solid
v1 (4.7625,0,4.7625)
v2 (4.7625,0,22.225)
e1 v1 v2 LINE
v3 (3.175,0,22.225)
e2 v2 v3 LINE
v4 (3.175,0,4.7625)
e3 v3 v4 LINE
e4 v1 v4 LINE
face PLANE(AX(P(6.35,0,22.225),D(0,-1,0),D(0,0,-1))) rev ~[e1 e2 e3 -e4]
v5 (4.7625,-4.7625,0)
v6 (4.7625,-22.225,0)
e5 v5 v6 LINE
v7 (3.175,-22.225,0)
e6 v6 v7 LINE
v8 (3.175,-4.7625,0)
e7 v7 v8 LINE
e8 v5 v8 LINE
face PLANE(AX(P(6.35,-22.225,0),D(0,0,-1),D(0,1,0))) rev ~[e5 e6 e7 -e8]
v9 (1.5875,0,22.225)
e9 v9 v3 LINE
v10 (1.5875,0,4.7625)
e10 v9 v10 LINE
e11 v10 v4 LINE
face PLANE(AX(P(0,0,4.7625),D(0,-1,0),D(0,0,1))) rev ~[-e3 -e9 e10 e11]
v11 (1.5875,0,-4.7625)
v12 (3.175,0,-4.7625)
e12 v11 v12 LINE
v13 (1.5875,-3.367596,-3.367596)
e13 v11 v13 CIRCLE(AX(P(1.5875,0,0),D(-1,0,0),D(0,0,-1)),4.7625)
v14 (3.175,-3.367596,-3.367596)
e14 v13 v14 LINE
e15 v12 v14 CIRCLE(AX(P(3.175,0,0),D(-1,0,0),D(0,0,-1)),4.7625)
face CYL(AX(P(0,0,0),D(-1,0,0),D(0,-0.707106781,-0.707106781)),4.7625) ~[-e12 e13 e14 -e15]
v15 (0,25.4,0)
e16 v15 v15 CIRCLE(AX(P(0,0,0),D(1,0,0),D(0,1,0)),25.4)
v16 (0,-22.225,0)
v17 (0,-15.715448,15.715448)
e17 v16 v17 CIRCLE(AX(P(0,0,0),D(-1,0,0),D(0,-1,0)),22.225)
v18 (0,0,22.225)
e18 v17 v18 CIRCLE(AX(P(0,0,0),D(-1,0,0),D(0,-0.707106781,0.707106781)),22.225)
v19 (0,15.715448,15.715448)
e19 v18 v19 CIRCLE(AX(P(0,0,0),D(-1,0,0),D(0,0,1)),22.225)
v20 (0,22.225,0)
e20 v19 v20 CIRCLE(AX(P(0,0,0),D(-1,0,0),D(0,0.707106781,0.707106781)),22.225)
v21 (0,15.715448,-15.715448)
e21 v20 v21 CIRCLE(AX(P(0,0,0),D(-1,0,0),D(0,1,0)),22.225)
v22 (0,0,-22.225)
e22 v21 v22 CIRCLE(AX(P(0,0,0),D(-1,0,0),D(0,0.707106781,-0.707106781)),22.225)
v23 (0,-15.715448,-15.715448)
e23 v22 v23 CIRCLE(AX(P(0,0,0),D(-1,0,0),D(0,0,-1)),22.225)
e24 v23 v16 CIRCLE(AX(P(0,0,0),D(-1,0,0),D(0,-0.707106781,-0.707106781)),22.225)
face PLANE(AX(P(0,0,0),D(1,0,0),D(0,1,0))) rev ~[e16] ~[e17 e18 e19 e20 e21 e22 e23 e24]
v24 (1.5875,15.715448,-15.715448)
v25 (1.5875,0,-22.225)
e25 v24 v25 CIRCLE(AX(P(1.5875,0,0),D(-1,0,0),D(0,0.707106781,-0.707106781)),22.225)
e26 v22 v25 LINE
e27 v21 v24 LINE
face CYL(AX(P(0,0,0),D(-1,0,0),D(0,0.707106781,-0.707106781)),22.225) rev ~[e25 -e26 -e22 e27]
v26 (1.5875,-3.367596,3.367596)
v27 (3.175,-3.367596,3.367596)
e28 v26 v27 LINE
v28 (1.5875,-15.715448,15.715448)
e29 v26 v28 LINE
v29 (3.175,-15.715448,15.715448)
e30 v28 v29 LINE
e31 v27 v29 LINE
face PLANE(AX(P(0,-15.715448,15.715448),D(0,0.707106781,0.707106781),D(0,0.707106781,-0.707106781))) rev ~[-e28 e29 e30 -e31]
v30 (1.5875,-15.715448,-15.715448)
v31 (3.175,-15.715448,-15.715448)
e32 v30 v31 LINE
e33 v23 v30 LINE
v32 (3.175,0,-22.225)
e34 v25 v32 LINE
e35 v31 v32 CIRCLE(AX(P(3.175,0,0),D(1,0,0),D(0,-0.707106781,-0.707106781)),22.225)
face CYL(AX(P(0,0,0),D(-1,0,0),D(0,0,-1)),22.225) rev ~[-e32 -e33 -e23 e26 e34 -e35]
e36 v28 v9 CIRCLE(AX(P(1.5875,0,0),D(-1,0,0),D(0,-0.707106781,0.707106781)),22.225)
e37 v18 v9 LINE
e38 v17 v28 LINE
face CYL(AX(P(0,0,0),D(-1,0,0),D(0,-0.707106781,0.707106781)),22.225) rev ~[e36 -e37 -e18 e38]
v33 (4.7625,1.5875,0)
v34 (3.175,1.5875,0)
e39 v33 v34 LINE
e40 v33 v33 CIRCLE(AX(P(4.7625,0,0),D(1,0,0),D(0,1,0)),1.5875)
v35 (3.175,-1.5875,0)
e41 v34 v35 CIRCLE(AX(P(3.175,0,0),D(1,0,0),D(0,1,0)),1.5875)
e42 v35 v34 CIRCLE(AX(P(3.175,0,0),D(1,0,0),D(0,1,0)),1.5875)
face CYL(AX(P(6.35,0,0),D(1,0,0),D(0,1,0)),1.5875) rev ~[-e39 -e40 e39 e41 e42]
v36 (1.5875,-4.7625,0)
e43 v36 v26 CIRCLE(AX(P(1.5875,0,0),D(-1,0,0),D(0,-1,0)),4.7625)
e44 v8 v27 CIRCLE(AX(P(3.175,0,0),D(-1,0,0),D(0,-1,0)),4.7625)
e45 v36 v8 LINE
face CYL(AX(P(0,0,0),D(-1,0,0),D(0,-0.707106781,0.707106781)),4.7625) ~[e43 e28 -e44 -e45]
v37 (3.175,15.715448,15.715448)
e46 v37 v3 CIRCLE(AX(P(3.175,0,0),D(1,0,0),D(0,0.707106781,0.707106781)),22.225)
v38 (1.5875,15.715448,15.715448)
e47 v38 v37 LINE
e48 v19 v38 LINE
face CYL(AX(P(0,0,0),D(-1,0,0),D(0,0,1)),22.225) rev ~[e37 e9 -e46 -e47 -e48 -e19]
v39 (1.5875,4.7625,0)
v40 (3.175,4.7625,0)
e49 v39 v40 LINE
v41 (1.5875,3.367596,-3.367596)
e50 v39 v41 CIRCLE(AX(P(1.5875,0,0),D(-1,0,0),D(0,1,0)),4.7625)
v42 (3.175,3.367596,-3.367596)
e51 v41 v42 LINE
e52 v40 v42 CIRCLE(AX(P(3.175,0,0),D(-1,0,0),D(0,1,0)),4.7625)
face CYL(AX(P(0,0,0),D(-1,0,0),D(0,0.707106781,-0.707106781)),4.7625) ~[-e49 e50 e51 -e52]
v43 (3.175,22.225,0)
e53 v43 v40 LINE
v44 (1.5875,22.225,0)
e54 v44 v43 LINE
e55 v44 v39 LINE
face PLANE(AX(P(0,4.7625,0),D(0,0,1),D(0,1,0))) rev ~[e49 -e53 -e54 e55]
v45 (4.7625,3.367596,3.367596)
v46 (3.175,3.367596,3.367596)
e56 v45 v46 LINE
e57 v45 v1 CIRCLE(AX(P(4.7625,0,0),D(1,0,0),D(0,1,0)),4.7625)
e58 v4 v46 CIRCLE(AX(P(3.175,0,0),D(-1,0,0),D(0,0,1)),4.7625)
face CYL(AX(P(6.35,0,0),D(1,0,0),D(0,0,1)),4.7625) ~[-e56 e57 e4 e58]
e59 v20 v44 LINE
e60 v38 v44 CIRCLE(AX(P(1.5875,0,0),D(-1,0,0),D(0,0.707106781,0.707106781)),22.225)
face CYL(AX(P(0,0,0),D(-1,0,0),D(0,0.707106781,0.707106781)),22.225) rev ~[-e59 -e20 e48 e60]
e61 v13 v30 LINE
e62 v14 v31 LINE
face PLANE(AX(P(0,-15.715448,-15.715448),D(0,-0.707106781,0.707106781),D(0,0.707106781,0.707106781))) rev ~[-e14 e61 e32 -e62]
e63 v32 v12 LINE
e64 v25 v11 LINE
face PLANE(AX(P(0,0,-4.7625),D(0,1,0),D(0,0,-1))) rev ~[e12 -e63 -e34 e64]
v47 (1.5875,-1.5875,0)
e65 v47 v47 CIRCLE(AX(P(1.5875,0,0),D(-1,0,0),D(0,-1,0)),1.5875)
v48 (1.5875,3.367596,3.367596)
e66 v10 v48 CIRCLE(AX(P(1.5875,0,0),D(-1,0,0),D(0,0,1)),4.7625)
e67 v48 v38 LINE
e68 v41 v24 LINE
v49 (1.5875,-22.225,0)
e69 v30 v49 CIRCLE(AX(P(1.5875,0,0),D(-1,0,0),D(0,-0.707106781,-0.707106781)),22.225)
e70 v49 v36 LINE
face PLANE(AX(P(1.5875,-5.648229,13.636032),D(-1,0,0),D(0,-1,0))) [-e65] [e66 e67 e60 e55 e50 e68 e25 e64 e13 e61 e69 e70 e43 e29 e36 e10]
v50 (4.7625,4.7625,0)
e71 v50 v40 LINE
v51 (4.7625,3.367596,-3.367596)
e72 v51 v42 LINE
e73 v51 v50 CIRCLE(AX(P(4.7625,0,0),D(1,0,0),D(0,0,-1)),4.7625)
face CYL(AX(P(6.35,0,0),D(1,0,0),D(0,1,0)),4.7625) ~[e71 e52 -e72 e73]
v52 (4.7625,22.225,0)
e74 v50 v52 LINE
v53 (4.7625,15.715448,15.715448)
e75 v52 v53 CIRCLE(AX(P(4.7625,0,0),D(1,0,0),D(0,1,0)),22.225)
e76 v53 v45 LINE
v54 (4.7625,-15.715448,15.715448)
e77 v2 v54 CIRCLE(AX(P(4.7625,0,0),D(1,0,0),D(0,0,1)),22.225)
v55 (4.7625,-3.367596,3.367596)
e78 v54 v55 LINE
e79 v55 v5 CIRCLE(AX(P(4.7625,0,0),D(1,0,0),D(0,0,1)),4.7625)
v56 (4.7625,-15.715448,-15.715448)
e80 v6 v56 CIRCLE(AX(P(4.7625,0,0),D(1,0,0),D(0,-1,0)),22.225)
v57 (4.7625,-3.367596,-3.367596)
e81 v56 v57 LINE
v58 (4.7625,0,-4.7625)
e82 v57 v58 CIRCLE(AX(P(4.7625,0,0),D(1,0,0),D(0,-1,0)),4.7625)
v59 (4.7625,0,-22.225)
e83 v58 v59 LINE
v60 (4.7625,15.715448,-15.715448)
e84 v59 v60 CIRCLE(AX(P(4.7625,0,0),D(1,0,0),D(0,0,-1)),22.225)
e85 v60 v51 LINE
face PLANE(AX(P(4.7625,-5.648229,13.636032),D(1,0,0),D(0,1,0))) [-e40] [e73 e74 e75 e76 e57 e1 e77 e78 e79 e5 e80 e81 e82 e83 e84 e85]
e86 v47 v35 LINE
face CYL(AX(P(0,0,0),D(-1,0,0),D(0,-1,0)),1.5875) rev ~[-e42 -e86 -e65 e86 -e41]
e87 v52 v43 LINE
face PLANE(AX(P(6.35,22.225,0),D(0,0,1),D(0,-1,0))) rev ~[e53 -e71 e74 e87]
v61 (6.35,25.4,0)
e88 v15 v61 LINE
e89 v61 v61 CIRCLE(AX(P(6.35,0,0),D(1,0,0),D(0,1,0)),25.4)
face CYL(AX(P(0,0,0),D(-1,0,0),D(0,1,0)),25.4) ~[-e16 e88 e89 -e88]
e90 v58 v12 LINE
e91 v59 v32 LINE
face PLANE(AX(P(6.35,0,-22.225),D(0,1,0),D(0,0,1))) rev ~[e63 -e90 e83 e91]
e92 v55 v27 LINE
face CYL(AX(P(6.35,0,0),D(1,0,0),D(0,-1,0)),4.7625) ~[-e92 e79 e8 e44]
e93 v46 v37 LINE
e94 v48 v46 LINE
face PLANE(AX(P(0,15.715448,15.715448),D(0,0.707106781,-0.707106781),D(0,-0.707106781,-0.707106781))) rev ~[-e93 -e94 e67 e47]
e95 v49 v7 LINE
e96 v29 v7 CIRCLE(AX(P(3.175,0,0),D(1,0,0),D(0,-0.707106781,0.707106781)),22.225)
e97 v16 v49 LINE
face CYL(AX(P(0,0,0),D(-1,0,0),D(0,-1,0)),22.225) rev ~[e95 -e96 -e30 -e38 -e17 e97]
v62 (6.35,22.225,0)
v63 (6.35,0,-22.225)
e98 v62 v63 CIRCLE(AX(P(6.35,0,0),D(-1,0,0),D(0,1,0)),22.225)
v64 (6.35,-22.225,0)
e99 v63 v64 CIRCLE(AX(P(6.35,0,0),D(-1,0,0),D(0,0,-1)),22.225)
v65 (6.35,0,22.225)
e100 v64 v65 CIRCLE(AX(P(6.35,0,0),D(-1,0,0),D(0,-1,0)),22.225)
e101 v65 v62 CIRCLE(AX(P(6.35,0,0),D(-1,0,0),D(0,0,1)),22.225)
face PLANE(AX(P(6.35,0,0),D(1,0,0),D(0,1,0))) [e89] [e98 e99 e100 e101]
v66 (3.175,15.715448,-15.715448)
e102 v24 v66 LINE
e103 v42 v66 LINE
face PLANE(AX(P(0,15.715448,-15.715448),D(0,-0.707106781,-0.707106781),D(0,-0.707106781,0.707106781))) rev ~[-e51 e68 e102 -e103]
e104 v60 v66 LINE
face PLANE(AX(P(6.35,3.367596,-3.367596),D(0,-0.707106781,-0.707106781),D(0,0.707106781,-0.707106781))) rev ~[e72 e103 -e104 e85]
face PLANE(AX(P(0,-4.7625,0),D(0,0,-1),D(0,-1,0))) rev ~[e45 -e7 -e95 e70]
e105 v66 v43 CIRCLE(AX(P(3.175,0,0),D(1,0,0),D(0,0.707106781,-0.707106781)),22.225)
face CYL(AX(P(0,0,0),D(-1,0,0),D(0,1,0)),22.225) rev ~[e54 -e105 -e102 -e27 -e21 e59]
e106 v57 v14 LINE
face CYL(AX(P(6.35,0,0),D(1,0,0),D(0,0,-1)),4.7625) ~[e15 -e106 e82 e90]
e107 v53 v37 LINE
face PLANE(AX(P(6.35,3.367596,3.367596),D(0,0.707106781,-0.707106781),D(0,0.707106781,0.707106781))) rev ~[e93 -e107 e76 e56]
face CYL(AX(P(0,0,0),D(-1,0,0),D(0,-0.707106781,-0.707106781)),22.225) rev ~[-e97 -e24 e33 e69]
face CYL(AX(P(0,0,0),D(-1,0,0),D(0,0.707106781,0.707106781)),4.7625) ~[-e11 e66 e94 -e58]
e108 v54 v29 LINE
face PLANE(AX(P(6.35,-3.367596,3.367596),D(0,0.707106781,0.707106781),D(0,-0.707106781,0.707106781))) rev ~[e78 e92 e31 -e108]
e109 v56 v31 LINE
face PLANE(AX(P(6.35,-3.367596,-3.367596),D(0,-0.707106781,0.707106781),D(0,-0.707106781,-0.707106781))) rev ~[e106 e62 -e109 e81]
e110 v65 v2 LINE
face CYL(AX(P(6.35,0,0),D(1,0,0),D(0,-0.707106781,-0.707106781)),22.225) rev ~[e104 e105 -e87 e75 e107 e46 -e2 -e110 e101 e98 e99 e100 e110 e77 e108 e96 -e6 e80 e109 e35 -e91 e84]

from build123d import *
from build123d import SkipClean  # not in build123d's __all__

# Parameters (mm, degrees)
F0_R       = 25.4
F1_DEPTH   = 6.35
F2_R       = 1.5875
F3_DEPTH   = 3.175
F4_DEPTH   = 1.5875
F5_R       = 1.5875
F3_FACE4_R = 1.5875
F4_FACE_R  = 1.5875
F6_DEPTH   = 1.5875
F7_DEPTH   = 3.175


with BuildPart() as f1:
    # F0 (on Right) → F1 (new body)
    with BuildSketch(Plane.YZ):
        Circle(F0_R)
    extrude(amount=F1_DEPTH)

    # F2 (on face) → F3 (cut)
    with BuildSketch(Plane.YZ.offset(6.35)):
        with BuildLine():
            Line((-3.3675960454, 3.3675960454), (-15.7154482119, 15.7154482119))
            ThreePointArc((-15.7154482119, 15.7154482119), (-20.5332226101, 8.5051392843), (-22.225, 0))
            Line((-22.225, 0), (-4.7625, 0))
            ThreePointArc((-4.7625, 0), (-4.3999762736, 1.8225298466), (-3.3675960454, 3.3675960454))
        make_face()
        with BuildLine():
            ThreePointArc((-15.7154482119, -15.7154482119), (-8.5051392843, -20.5332226101), (0, -22.225))
            Line((0, -22.225), (0, -4.7625))
            ThreePointArc((0, -4.7625), (-1.8225298466, -4.3999762736), (-3.3675960454, -3.3675960454))
            Line((-3.3675960454, -3.3675960454), (-15.7154482119, -15.7154482119))
        make_face()
        with BuildLine():
            ThreePointArc((15.7154482119, -15.7154482119), (20.5332226101, -8.5051392843), (22.225, 0))
            Line((22.225, 0), (4.7625, 0))
            ThreePointArc((4.7625, 0), (4.3999762736, -1.8225298466), (3.3675960454, -3.3675960454))
            Line((3.3675960454, -3.3675960454), (15.7154482119, -15.7154482119))
        make_face()
        with BuildLine():
            Line((3.3675960454, 3.3675960454), (15.7154482119, 15.7154482119))
            ThreePointArc((15.7154482119, 15.7154482119), (8.5051392843, 20.5332226101), (0, 22.225))
            Line((0, 22.225), (0, 4.7625))
            ThreePointArc((0, 4.7625), (1.8225298466, 4.3999762736), (3.3675960454, 3.3675960454))
        make_face()
        Circle(F2_R)
    extrude(amount=-F3_DEPTH, mode=Mode.SUBTRACT)

    # F2 (on face) → F4 (cut)
    with BuildSketch(Plane.YZ.offset(6.35)):
        with BuildLine():
            Line((0, 4.7625), (0, 22.225))
            ThreePointArc((0, 22.225), (-8.5051392843, 20.5332226101), (-15.7154482119, 15.7154482119))
            Line((-15.7154482119, 15.7154482119), (-3.3675960454, 3.3675960454))
            ThreePointArc((-3.3675960454, 3.3675960454), (-1.8225298466, 4.3999762736), (0, 4.7625))
        make_face()
        with BuildLine():
            Line((4.7625, 0), (22.225, 0))
            ThreePointArc((22.225, 0), (20.5332226101, 8.5051392843), (15.7154482119, 15.7154482119))
            Line((15.7154482119, 15.7154482119), (3.3675960454, 3.3675960454))
            ThreePointArc((3.3675960454, 3.3675960454), (4.3999762736, 1.8225298466), (4.7625, 0))
        make_face()
        with BuildLine():
            ThreePointArc((0, -22.225), (8.5051392843, -20.5332226101), (15.7154482119, -15.7154482119))
            Line((15.7154482119, -15.7154482119), (3.3675960454, -3.3675960454))
            ThreePointArc((3.3675960454, -3.3675960454), (1.8225298466, -4.3999762736), (0, -4.7625))
            Line((0, -4.7625), (0, -22.225))
        make_face()
        with BuildLine():
            ThreePointArc((-22.225, 0), (-20.5332226101, -8.5051392843), (-15.7154482119, -15.7154482119))
            Line((-15.7154482119, -15.7154482119), (-3.3675960454, -3.3675960454))
            ThreePointArc((-3.3675960454, -3.3675960454), (-4.3999762736, -1.8225298466), (-4.7625, 0))
            Line((-4.7625, 0), (-22.225, 0))
        make_face()
        with BuildLine():
            ThreePointArc((3.3675960454, -3.3675960454), (4.3999762736, -1.8225298466), (4.7625, 0))
            ThreePointArc((4.7625, 0), (4.3999762736, 1.8225298466), (3.3675960454, 3.3675960454))
            ThreePointArc((3.3675960454, 3.3675960454), (1.8225298466, 4.3999762736), (0, 4.7625))
            ThreePointArc((0, 4.7625), (-1.8225298466, 4.3999762736), (-3.3675960454, 3.3675960454))
            ThreePointArc((-3.3675960454, 3.3675960454), (-4.3999762736, 1.8225298466), (-4.7625, 0))
            ThreePointArc((-4.7625, 0), (-4.3999762736, -1.8225298466), (-3.3675960454, -3.3675960454))
            ThreePointArc((-3.3675960454, -3.3675960454), (-1.8225298466, -4.3999762736), (0, -4.7625))
            ThreePointArc((0, -4.7625), (1.8225298466, -4.3999762736), (3.3675960454, -3.3675960454))
        make_face()
        Circle(F2_R, mode=Mode.SUBTRACT)
    extrude(amount=-F4_DEPTH, mode=Mode.SUBTRACT)

    # F5 (on face) + F3_face (on face) + F3_face1 (on face) + F3_face2 (on face) + F3_face3 (on face) + F3_face4 (on face) + F4_face (on face) → F6 (cut)
    with BuildSketch(Plane(origin=(0, 0, 0), x_dir=(0, -1, 0), z_dir=(-1, 0, 0))):
        with BuildLine():
            Line((3.3675960454, 3.3675960454), (15.7154482119, 15.7154482119))
            ThreePointArc((15.7154482119, 15.7154482119), (8.5051392843, 20.5332226101), (0, 22.225))
            Line((0, 22.225), (0, 4.7625))
            ThreePointArc((0, 4.7625), (1.8225298466, 4.3999762736), (3.3675960454, 3.3675960454))
        make_face()
        with BuildLine():
            ThreePointArc((15.7154482119, -15.7154482119), (20.5332226101, -8.5051392843), (22.225, 0))
            Line((22.225, 0), (4.7625, 0))
            ThreePointArc((4.7625, 0), (4.3999762736, -1.8225298466), (3.3675960454, -3.3675960454))
            Line((3.3675960454, -3.3675960454), (15.7154482119, -15.7154482119))
        make_face()
        with BuildLine():
            ThreePointArc((-15.7154482119, -15.7154482119), (-8.5051392843, -20.5332226101), (0, -22.225))
            Line((0, -22.225), (0, -4.7625))
            ThreePointArc((0, -4.7625), (-1.8225298466, -4.3999762736), (-3.3675960454, -3.3675960454))
            Line((-3.3675960454, -3.3675960454), (-15.7154482119, -15.7154482119))
        make_face()
        with BuildLine():
            Line((-3.3675960454, 3.3675960454), (-15.7154482119, 15.7154482119))
            ThreePointArc((-15.7154482119, 15.7154482119), (-20.5332226101, 8.5051392843), (-22.225, 0))
            Line((-22.225, 0), (-4.7625, 0))
            ThreePointArc((-4.7625, 0), (-4.3999762736, 1.8225298466), (-3.3675960454, 3.3675960454))
        make_face()
        with BuildLine():
            ThreePointArc((3.3675960454, -3.3675960454), (4.3999762736, -1.8225298466), (4.7625, 0))
            ThreePointArc((4.7625, 0), (4.3999762736, 1.8225298466), (3.3675960454, 3.3675960454))
            ThreePointArc((3.3675960454, 3.3675960454), (1.8225298466, 4.3999762736), (0, 4.7625))
            ThreePointArc((0, 4.7625), (-1.8225298466, 4.3999762736), (-3.3675960454, 3.3675960454))
            ThreePointArc((-3.3675960454, 3.3675960454), (-4.3999762736, 1.8225298466), (-4.7625, 0))
            ThreePointArc((-4.7625, 0), (-4.3999762736, -1.8225298466), (-3.3675960454, -3.3675960454))
            ThreePointArc((-3.3675960454, -3.3675960454), (-1.8225298466, -4.3999762736), (0, -4.7625))
            ThreePointArc((0, -4.7625), (1.8225298466, -4.3999762736), (3.3675960454, -3.3675960454))
        make_face()
        Circle(F5_R, mode=Mode.SUBTRACT)
    with BuildSketch(Plane(origin=(3.175, -13.844128687, 5.7344258614), x_dir=(0, 1, 0), z_dir=(1, 0, 0))):
        with BuildLine():
            ThreePointArc((-1.8713195248, 9.9810223505), (-6.689093923, 2.7707134229), (-8.380871313, -5.7344258614))
            Line((-8.380871313, -5.7344258614), (9.081628687, -5.7344258614))
            ThreePointArc((9.081628687, -5.7344258614), (9.4441524134, -3.9118960148), (10.4765326416, -2.366829816))
            Line((10.4765326416, -2.366829816), (-1.8713195248, 9.9810223505))
        make_face()
    with BuildSketch(Plane(origin=(3.175, -5.7344258614, -13.844128687), x_dir=(0, 1, 0), z_dir=(1, 0, 0))):
        with BuildLine():
            ThreePointArc((-9.9810223505, -1.8713195248), (-2.7707134229, -6.689093923), (5.7344258614, -8.380871313))
            Line((5.7344258614, -8.380871313), (5.7344258614, 9.081628687))
            ThreePointArc((5.7344258614, 9.081628687), (3.9118960148, 9.4441524134), (2.366829816, 10.4765326416))
            Line((2.366829816, 10.4765326416), (-9.9810223505, -1.8713195248))
        make_face()
    with BuildSketch(Plane(origin=(3.175, 13.844128687, -5.7344258614), x_dir=(0, 1, 0), z_dir=(1, 0, 0))):
        with BuildLine():
            Line((-10.4765326416, 2.366829816), (1.8713195248, -9.9810223505))
            ThreePointArc((1.8713195248, -9.9810223505), (6.689093923, -2.7707134229), (8.380871313, 5.7344258614))
            Line((8.380871313, 5.7344258614), (-9.081628687, 5.7344258614))
            ThreePointArc((-9.081628687, 5.7344258614), (-9.4441524134, 3.9118960148), (-10.4765326416, 2.366829816))
        make_face()
    with BuildSketch(Plane(origin=(3.175, 5.7344258614, 13.844128687), x_dir=(0, 1, 0), z_dir=(1, 0, 0))):
        with BuildLine():
            ThreePointArc((9.9810223505, 1.8713195248), (2.7707134229, 6.689093923), (-5.7344258614, 8.380871313))
            Line((-5.7344258614, 8.380871313), (-5.7344258614, -9.081628687))
            ThreePointArc((-5.7344258614, -9.081628687), (-3.9118960148, -9.4441524134), (-2.366829816, -10.4765326416))
            Line((-2.366829816, -10.4765326416), (9.9810223505, 1.8713195248))
        make_face()
    with BuildSketch(Plane.YZ.offset(3.175)):
        Circle(F3_FACE4_R)
    with BuildSketch(Plane.YZ.offset(4.7625)):
        with BuildLine():
            Line((-15.7154482119, 15.7154482119), (-3.3675960454, 3.3675960454))
            ThreePointArc((-3.3675960454, 3.3675960454), (-4.3999762736, 1.8225298466), (-4.7625, 0))
            Line((-4.7625, 0), (-22.225, 0))
            ThreePointArc((-22.225, 0), (-20.5332226101, -8.5051392843), (-15.7154482119, -15.7154482119))
            Line((-15.7154482119, -15.7154482119), (-3.3675960454, -3.3675960454))
            ThreePointArc((-3.3675960454, -3.3675960454), (-1.8225298466, -4.3999762736), (0, -4.7625))
            Line((0, -4.7625), (0, -22.225))
            ThreePointArc((0, -22.225), (8.5051392843, -20.5332226101), (15.7154482119, -15.7154482119))
            Line((15.7154482119, -15.7154482119), (3.3675960454, -3.3675960454))
            ThreePointArc((3.3675960454, -3.3675960454), (4.3999762736, -1.8225298466), (4.7625, 0))
            Line((4.7625, 0), (22.225, 0))
            ThreePointArc((22.225, 0), (20.5332226101, 8.5051392843), (15.7154482119, 15.7154482119))
            Line((15.7154482119, 15.7154482119), (3.3675960454, 3.3675960454))
            ThreePointArc((3.3675960454, 3.3675960454), (1.8225298466, 4.3999762736), (0, 4.7625))
            Line((0, 4.7625), (0, 22.225))
            ThreePointArc((0, 22.225), (-8.5051392843, 20.5332226101), (-15.7154482119, 15.7154482119))
        make_face()
        Circle(F4_FACE_R, mode=Mode.SUBTRACT)
    extrude(amount=-F6_DEPTH, dir=(-1, 0, 0), mode=Mode.SUBTRACT)

    # F5 (on face) → F7 (cut)
    with BuildSketch(Plane(origin=(0, 0, 0), x_dir=(0, -1, 0), z_dir=(-1, 0, 0))):
        with BuildLine():
            Line((0, 4.7625), (0, 22.225))
            ThreePointArc((0, 22.225), (-8.5051392843, 20.5332226101), (-15.7154482119, 15.7154482119))
            Line((-15.7154482119, 15.7154482119), (-3.3675960454, 3.3675960454))
            ThreePointArc((-3.3675960454, 3.3675960454), (-1.8225298466, 4.3999762736), (0, 4.7625))
        make_face()
        with BuildLine():
            ThreePointArc((-22.225, 0), (-20.5332226101, -8.5051392843), (-15.7154482119, -15.7154482119))
            Line((-15.7154482119, -15.7154482119), (-3.3675960454, -3.3675960454))
            ThreePointArc((-3.3675960454, -3.3675960454), (-4.3999762736, -1.8225298466), (-4.7625, 0))
            Line((-4.7625, 0), (-22.225, 0))
        make_face()
        with BuildLine():
            ThreePointArc((0, -22.225), (8.5051392843, -20.5332226101), (15.7154482119, -15.7154482119))
            Line((15.7154482119, -15.7154482119), (3.3675960454, -3.3675960454))
            ThreePointArc((3.3675960454, -3.3675960454), (1.8225298466, -4.3999762736), (0, -4.7625))
            Line((0, -4.7625), (0, -22.225))
        make_face()
        with BuildLine():
            Line((4.7625, 0), (22.225, 0))
            ThreePointArc((22.225, 0), (20.5332226101, 8.5051392843), (15.7154482119, 15.7154482119))
            Line((15.7154482119, 15.7154482119), (3.3675960454, 3.3675960454))
            ThreePointArc((3.3675960454, 3.3675960454), (4.3999762736, 1.8225298466), (4.7625, 0))
        make_face()
        Circle(F5_R)
    with SkipClean():  # cleaning this boolean's faces spoils the solid; the shape is the same uncleaned
        extrude(amount=-F7_DEPTH, mode=Mode.SUBTRACT)


solid = f1.part
